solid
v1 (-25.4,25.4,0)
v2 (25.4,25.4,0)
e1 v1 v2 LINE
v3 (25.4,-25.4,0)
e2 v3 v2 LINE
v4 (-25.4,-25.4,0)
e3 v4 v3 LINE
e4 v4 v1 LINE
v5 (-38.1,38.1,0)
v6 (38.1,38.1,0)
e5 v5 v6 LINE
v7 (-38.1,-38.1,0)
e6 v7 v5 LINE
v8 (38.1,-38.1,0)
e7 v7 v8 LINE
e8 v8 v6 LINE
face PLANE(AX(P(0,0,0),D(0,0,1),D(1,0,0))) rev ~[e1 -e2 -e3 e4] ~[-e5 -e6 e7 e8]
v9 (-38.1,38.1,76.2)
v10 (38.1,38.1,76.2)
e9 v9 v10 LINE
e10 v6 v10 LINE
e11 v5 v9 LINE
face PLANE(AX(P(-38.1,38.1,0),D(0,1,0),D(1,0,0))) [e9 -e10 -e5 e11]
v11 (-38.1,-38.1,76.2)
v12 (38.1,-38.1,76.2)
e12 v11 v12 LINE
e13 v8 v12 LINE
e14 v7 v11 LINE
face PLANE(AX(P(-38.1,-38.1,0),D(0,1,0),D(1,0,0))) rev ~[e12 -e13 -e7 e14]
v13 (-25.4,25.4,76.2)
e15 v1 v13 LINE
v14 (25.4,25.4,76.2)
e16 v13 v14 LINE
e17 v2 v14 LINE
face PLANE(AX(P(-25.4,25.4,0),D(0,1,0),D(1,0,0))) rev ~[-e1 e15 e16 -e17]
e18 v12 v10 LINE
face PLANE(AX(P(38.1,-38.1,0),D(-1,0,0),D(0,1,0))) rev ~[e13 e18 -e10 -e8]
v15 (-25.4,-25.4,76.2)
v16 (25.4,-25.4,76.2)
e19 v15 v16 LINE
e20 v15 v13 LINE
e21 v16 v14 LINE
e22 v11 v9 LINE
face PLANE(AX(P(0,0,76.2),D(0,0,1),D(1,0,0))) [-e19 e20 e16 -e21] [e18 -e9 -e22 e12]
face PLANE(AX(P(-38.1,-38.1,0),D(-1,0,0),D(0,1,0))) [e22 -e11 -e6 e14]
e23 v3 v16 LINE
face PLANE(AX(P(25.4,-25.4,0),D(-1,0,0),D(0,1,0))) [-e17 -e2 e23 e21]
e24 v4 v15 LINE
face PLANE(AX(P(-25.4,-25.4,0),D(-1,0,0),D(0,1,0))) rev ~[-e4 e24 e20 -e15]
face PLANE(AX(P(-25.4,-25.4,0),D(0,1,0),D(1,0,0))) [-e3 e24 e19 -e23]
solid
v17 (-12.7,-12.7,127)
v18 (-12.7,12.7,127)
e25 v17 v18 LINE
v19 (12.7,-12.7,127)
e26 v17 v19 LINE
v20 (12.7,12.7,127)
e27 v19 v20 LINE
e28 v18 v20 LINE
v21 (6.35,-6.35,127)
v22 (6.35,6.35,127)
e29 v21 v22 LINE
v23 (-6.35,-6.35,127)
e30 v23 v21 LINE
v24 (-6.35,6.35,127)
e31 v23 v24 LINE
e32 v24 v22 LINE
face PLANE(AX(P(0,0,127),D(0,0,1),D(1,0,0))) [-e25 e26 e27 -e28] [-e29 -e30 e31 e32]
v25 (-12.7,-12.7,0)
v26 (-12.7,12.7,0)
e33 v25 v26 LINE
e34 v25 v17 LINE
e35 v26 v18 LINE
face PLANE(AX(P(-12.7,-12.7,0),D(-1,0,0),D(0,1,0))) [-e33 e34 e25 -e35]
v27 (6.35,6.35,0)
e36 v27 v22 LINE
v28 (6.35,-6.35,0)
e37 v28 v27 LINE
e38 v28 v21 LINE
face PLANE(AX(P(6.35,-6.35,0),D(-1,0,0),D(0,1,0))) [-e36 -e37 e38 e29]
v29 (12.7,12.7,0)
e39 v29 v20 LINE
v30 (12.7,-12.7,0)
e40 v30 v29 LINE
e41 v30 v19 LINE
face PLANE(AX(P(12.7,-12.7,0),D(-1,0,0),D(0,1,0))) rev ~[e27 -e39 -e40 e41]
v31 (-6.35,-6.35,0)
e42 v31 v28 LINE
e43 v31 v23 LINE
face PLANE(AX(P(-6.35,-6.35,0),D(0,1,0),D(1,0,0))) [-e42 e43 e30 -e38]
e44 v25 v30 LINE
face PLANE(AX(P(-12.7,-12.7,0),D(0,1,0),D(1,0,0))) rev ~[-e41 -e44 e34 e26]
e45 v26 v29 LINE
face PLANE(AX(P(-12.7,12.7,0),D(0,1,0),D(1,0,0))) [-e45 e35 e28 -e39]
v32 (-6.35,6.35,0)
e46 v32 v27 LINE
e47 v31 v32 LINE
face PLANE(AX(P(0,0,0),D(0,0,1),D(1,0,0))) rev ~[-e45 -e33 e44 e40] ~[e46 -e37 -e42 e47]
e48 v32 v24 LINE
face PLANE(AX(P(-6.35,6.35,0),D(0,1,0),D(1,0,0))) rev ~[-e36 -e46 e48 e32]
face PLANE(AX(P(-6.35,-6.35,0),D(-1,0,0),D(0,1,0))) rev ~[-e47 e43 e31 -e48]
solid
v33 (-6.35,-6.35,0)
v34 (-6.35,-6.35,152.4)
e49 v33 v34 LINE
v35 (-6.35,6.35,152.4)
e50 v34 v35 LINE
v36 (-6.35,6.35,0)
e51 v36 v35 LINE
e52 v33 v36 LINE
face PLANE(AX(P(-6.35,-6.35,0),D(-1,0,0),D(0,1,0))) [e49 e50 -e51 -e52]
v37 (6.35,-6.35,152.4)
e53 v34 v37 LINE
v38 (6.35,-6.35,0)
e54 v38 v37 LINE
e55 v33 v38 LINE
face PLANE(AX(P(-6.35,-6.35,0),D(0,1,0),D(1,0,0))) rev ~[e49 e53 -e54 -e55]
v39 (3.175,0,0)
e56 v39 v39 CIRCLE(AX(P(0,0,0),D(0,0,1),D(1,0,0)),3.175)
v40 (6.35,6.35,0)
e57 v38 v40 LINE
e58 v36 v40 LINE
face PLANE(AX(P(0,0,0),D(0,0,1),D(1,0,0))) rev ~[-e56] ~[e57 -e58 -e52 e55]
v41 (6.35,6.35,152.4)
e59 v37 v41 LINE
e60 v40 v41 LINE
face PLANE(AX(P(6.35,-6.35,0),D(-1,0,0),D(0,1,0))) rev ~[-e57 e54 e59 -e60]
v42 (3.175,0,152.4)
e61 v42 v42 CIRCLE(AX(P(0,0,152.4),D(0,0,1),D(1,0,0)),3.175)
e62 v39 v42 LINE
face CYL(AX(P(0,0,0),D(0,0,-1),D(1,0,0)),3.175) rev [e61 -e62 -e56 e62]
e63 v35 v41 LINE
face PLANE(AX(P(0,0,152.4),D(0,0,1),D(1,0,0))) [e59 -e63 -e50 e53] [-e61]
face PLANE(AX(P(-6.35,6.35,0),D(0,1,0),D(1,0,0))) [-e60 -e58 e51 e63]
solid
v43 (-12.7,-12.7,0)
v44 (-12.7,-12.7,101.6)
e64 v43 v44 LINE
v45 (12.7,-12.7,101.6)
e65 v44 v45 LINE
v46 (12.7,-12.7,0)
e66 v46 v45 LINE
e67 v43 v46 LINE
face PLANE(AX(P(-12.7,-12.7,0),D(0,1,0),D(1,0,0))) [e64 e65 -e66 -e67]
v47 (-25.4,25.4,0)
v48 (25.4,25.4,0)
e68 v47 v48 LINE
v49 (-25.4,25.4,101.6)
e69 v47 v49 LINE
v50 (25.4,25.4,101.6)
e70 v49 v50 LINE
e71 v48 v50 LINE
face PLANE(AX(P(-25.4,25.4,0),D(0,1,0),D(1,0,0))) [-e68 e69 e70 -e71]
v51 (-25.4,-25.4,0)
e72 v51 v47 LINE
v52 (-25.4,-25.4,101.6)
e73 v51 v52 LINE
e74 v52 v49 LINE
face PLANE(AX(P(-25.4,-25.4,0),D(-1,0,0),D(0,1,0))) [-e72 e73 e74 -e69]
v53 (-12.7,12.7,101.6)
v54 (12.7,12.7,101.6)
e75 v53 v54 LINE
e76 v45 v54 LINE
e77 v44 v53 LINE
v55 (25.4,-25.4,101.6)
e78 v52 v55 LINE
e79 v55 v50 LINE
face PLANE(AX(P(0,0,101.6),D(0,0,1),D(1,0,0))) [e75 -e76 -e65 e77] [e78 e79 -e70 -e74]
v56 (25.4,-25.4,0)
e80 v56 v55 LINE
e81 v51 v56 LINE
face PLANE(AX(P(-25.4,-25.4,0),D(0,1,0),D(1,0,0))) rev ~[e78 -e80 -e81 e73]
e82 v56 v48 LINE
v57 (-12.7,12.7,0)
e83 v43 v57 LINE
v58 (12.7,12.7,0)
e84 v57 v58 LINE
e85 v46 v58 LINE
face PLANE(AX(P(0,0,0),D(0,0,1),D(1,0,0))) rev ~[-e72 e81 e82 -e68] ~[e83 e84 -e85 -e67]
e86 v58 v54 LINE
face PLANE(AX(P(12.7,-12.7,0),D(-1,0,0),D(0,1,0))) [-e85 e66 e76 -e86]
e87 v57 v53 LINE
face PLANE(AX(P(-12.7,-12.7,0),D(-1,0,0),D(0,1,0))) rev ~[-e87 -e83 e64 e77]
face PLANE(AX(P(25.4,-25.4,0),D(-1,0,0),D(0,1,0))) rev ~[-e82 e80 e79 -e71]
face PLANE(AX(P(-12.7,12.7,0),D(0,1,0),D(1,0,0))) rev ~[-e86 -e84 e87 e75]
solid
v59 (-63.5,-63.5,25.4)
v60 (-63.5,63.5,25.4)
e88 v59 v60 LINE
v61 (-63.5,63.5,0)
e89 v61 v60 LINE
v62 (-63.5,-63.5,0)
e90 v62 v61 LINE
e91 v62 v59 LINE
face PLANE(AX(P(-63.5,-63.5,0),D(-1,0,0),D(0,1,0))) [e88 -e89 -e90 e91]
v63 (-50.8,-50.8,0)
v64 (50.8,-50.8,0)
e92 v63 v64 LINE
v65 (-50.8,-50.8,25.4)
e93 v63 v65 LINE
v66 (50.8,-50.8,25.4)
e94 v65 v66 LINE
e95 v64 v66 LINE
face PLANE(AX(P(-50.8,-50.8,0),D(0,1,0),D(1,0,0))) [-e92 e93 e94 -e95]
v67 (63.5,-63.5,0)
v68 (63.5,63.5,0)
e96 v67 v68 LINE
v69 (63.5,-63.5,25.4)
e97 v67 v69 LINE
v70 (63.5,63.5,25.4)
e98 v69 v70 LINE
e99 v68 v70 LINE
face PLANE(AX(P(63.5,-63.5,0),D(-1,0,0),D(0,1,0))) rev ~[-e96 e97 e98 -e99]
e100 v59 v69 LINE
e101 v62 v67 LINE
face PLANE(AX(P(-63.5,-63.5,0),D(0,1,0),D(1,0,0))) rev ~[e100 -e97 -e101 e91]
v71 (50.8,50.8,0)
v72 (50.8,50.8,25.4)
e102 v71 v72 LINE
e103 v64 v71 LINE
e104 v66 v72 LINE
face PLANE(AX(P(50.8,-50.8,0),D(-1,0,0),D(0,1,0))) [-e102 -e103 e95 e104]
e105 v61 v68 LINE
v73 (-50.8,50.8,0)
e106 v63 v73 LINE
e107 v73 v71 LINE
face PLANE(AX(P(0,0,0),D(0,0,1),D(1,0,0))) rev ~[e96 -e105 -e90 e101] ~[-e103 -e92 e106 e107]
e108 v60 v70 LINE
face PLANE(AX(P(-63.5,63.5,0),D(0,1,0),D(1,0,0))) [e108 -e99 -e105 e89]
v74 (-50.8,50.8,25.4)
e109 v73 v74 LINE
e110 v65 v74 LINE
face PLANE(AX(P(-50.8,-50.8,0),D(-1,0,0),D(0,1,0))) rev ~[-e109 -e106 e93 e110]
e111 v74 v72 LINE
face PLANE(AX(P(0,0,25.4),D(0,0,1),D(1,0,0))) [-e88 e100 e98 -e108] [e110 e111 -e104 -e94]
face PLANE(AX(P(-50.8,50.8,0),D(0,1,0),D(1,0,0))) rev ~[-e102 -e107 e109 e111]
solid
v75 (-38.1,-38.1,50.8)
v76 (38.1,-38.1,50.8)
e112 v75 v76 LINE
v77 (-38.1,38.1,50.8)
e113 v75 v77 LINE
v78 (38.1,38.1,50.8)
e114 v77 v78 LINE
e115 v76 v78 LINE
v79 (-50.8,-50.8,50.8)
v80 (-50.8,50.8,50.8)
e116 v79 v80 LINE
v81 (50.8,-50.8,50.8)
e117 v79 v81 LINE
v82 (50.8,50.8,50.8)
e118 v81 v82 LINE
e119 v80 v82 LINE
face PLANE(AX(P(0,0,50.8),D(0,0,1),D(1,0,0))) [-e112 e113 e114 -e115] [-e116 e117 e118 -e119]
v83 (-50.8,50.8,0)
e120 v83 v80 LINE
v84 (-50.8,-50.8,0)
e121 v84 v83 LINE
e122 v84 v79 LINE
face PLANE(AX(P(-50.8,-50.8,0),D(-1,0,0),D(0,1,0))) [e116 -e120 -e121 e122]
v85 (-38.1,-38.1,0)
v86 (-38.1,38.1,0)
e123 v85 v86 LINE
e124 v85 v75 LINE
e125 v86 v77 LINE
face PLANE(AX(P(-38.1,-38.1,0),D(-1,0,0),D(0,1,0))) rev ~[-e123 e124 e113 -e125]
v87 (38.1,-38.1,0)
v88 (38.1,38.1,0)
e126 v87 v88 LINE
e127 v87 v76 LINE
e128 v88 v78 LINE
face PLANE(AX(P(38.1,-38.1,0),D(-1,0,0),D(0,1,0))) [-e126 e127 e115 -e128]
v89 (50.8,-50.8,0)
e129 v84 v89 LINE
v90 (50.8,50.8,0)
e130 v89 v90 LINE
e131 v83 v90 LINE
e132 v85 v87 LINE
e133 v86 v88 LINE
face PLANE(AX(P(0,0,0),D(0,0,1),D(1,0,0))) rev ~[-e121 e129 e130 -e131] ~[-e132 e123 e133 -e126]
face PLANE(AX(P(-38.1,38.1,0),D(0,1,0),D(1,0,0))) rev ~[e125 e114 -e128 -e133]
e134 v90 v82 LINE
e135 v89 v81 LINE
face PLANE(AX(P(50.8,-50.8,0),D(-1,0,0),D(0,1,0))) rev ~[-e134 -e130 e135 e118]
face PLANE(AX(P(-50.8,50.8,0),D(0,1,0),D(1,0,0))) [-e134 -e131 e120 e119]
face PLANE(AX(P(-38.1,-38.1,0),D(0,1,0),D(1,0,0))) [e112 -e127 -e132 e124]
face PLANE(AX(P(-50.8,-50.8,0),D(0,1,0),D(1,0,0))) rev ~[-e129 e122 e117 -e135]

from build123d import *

# Parameters (mm, degrees)
F0_W     = 127
F0_H     = 127
F0_W_2   = 101.6
F0_H_2   = 101.6
F1_DEPTH = 25.4
F0_W_3   = 76.2
F0_H_3   = 76.2
F2_DEPTH = 50.8
F0_W_4   = 50.8
F0_H_4   = 50.8
F3_DEPTH = 76.2
F0_W_5   = 25.4
F0_H_5   = 25.4
F4_DEPTH = 101.6
F0_W_6   = 12.7
F0_H_6   = 12.7
F5_DEPTH = 127
F0_R     = 3.175
F6_DEPTH = 152.4


# Not quite as in the source:
# - the program builds the solid bodies; features that only make, move or delete a surface that nothing else refers to are left out


with BuildPart() as f1:
    # F0 (on Top) → F1 (new body)
    with BuildSketch(Plane.XY):
        Rectangle(F0_W, F0_H)
        Rectangle(F0_W_2, F0_H_2, mode=Mode.SUBTRACT)
    extrude(amount=F1_DEPTH)


with BuildPart() as f2:
    # F0 (on Top) → F2 (new body)
    with BuildSketch(Plane.XY):
        Rectangle(F0_W_2, F0_H_2)
        Rectangle(F0_W_3, F0_H_3, mode=Mode.SUBTRACT)
    extrude(amount=F2_DEPTH)


with BuildPart() as f3:
    # F0 (on Top) → F3 (new body)
    with BuildSketch(Plane.XY):
        Rectangle(F0_W_3, F0_H_3)
        Rectangle(F0_W_4, F0_H_4, mode=Mode.SUBTRACT)
    extrude(amount=F3_DEPTH)


with BuildPart() as f4:
    # F0 (on Top) → F4 (new body)
    with BuildSketch(Plane.XY):
        Rectangle(F0_W_4, F0_H_4)
        Rectangle(F0_W_5, F0_H_5, mode=Mode.SUBTRACT)
    extrude(amount=F4_DEPTH)


with BuildPart() as f5:
    # F0 (on Top) → F5 (new body)
    with BuildSketch(Plane.XY):
        Rectangle(F0_W_5, F0_H_5)
        Rectangle(F0_W_6, F0_H_6, mode=Mode.SUBTRACT)
    extrude(amount=F5_DEPTH)


with BuildPart() as f6:
    # F0 (on Top) → F6 (new body)
    with BuildSketch(Plane.XY):
        Rectangle(F0_W_6, F0_H_6)
        Circle(F0_R, mode=Mode.SUBTRACT)
    extrude(amount=F6_DEPTH)


solid = Compound([f1.part, f2.part, f3.part, f4.part, f5.part, f6.part])
